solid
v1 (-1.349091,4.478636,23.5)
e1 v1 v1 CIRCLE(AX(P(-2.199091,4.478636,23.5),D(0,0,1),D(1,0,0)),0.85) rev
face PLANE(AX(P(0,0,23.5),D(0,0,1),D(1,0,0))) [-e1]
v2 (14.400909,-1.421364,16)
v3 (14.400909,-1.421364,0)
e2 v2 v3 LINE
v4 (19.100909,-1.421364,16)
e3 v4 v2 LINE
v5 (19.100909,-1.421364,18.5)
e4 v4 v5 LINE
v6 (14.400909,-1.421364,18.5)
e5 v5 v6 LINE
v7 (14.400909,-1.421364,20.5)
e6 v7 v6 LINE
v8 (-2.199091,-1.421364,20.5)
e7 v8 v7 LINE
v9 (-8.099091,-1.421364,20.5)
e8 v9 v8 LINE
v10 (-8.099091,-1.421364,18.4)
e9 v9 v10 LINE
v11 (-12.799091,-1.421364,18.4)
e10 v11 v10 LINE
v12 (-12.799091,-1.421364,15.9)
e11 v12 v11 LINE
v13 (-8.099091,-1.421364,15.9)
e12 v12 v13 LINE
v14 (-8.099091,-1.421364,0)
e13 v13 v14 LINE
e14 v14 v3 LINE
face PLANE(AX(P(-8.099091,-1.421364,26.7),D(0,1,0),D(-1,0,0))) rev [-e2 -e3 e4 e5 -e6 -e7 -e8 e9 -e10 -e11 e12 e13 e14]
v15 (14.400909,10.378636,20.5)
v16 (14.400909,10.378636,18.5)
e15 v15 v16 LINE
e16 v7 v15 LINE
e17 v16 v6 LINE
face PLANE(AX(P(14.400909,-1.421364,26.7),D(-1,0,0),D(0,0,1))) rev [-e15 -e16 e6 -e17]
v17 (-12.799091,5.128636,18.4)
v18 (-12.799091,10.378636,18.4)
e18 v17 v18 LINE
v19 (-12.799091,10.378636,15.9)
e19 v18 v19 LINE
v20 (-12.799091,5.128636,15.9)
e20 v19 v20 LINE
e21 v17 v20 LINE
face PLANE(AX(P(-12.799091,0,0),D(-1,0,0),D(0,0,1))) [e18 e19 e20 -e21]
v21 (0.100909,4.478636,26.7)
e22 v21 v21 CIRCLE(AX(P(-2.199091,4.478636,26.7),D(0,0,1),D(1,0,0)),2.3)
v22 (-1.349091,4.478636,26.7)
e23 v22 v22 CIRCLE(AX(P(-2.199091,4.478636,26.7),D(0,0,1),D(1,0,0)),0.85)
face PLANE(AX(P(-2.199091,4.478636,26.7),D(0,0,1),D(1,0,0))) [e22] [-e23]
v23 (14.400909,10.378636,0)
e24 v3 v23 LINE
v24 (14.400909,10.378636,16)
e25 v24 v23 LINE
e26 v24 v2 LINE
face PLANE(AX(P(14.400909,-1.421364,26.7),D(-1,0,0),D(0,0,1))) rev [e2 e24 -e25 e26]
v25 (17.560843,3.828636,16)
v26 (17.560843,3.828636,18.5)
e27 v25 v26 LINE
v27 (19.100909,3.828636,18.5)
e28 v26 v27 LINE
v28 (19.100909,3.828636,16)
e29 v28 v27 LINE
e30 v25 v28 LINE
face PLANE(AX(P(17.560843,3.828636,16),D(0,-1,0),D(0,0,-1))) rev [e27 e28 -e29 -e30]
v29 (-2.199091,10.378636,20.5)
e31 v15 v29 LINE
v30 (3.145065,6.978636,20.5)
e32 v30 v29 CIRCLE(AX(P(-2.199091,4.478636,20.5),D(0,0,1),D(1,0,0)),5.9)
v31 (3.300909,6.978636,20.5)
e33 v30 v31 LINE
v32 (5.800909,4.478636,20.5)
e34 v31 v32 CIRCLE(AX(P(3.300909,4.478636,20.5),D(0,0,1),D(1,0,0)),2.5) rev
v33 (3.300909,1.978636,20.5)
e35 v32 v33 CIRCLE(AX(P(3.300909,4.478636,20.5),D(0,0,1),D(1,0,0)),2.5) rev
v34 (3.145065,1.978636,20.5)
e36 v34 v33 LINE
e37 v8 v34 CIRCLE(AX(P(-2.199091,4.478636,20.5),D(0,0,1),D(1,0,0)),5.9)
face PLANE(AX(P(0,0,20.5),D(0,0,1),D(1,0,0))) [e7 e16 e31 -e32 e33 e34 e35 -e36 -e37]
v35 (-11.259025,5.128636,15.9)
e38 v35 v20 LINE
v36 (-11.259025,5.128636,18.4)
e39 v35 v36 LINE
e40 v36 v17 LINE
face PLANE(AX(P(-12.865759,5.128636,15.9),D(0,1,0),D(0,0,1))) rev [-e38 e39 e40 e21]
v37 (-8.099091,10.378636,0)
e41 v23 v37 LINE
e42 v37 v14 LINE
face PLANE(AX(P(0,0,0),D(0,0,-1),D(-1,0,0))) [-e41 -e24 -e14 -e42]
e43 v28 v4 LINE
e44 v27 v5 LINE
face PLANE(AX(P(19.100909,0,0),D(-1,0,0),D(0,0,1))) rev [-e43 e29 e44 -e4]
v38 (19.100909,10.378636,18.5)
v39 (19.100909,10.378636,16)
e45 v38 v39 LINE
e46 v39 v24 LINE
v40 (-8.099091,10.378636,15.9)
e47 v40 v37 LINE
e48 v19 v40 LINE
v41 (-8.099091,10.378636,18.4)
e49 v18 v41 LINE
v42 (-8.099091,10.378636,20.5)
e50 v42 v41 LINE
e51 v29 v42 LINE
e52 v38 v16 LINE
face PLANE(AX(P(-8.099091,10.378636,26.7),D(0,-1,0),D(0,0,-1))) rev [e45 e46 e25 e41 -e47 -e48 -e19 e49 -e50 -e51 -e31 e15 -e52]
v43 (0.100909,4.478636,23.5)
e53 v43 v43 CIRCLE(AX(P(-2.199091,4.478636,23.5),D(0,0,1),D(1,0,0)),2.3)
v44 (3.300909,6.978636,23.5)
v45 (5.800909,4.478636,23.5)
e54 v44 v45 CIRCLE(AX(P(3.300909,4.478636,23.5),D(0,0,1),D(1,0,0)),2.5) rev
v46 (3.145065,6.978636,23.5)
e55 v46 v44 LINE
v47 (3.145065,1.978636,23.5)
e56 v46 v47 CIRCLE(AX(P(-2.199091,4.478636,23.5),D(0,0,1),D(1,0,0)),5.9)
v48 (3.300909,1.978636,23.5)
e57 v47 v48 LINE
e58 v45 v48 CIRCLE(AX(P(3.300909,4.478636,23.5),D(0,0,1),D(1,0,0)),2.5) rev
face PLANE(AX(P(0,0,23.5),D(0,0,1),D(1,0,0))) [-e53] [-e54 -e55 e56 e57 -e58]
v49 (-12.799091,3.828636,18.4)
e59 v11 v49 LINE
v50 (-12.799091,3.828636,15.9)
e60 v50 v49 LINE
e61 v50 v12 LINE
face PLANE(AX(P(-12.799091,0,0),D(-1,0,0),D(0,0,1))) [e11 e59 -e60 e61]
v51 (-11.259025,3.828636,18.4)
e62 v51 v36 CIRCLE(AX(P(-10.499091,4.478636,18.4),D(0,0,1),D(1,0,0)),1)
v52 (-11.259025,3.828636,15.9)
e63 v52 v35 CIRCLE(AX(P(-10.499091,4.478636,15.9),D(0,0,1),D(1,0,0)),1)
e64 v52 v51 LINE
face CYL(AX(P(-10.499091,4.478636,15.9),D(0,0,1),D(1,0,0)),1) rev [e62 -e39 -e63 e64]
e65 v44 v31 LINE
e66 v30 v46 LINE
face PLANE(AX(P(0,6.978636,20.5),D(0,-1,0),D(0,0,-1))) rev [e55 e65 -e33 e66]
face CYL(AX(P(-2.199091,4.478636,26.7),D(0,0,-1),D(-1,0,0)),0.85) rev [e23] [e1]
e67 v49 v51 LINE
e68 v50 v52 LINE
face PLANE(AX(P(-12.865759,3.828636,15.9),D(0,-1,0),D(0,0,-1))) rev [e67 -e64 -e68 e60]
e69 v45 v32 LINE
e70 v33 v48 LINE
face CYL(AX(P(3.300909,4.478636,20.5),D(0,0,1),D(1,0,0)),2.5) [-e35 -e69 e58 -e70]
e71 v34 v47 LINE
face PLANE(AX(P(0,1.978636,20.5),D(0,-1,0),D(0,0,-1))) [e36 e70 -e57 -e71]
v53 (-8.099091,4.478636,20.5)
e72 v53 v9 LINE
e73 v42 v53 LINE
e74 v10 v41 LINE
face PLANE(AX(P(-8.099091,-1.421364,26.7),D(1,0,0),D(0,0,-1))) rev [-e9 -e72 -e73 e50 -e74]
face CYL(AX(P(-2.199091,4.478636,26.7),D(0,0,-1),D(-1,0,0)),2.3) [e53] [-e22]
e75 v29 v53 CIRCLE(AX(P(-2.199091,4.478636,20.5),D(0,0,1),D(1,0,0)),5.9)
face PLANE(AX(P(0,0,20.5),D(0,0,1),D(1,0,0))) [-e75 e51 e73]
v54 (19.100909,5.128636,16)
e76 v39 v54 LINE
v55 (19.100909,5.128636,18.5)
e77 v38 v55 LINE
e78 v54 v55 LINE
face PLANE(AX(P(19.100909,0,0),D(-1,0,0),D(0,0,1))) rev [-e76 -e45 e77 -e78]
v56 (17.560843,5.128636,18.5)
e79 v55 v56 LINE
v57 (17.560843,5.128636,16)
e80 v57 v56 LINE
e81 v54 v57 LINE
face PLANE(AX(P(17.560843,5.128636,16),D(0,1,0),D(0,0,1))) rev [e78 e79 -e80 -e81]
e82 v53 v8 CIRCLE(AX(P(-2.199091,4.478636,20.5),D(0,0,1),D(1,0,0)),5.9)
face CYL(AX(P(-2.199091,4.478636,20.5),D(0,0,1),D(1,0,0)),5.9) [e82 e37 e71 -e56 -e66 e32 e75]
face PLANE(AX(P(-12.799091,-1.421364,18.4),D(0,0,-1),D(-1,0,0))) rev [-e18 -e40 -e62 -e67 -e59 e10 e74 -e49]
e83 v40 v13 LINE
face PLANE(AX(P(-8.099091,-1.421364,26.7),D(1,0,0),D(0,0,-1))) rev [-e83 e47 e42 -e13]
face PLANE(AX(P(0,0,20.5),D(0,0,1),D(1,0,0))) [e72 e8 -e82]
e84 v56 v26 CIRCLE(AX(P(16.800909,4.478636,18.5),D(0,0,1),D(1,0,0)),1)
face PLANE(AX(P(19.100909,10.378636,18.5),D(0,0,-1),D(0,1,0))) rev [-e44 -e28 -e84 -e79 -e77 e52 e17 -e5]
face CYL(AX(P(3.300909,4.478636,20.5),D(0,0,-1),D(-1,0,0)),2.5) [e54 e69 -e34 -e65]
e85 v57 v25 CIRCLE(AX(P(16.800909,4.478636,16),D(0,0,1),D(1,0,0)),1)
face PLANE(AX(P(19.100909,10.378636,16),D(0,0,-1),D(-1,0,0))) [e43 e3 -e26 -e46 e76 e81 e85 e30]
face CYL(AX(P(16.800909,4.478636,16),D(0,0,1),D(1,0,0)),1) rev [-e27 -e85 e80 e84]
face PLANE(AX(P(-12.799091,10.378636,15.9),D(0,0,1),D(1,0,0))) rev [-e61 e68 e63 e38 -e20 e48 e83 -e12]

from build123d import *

# Parameters (mm, degrees)
SKETCH1_W           = 22.5
SKETCH1_H           = 11.8
BOSS_EXTRUDE1_DEPTH = 26.7
SKETCH2_W           = 2.5
SKETCH2_H           = 11.8
BOSS_EXTRUDE2_DEPTH = 4.7
SKETCH5_W           = 2.5
SKETCH5_H           = 11.8
BOSS_EXTRUDE3_DEPTH = 4.7
CUT_EXTRUDE1_DEPTH  = 6.2
FILLET1_R           = 2.5
FILLET2_R           = 2.5
CUT_EXTRUDE2_DEPTH  = 3.2
SKETCH7_R           = 2.3
SKETCH7_R_2         = 0.85
BOSS_EXTRUDE4_DEPTH = 3.2
CUT_EXTRUDE3_DEPTH  = 2.5
CUT_EXTRUDE4_DEPTH  = 2.5


with BuildPart() as part:
    # Sketch1 → Boss-Extrude1 (new body)
    with BuildSketch(Plane.XY):
        with Locations((3.150909091, 4.478636364)):
            Rectangle(SKETCH1_W, SKETCH1_H)
    extrude(amount=BOSS_EXTRUDE1_DEPTH)

    # Sketch2 → Boss-Extrude2 (add)
    with BuildSketch(Plane(origin=(14.400909091, 0, 0), x_dir=(0, 0, -1), z_dir=(1, 0, 0))):
        with Locations((-17.25, 4.478636364)):
            Rectangle(SKETCH2_W, SKETCH2_H)
    extrude(amount=BOSS_EXTRUDE2_DEPTH)

    # Sketch5 → Boss-Extrude3 (add)
    with BuildSketch(Plane.ZY.offset(8.099090909)):
        with Locations((17.15, 4.478636364)):
            Rectangle(SKETCH5_W, SKETCH5_H)
    extrude(amount=BOSS_EXTRUDE3_DEPTH)

    # Sketch6 → Cut-Extrude1 (cut)
    with BuildSketch(Plane.XY.offset(26.7)):
        with BuildLine():
            Line((5.800909091, 1.978636364), (3.145064777, 1.978636364))
            ThreePointArc((3.145064777, 1.978636364), (0.967926621, -0.499315019), (-2.199090896, -1.421363636))
            Line((-2.199090896, -1.421363636), (14.400909091, -1.421363636))
            Line((14.400909091, -1.421363636), (14.400909091, 10.378636364))
            Line((14.400909091, 10.378636364), (-2.199090917, 10.378636364))
            ThreePointArc((-2.199090917, 10.378636364), (0.967926612, 9.456587752), (3.145064777, 6.978636364))
            Line((3.145064777, 6.978636364), (5.800909091, 6.978636364))
            Line((5.800909091, 6.978636364), (5.800909091, 1.978636364))
        make_face()
        with BuildLine():
            Line((-8.099090909, -1.421363636), (-2.199090896, -1.421363636))
            ThreePointArc((-2.199090896, -1.421363636), (-6.371020914, 0.30670635), (-8.099090909, 4.478636364))
            Line((-8.099090909, 4.478636364), (-8.099090909, -1.421363636))
        make_face()
        with BuildLine():
            Line((-8.099090909, 10.378636364), (-8.099090909, 4.478636364))
            ThreePointArc((-8.099090909, 4.478636364), (-6.371020921, 8.65056637), (-2.199090917, 10.378636364))
            Line((-2.199090917, 10.378636364), (-8.099090909, 10.378636364))
        make_face()
    extrude(amount=-CUT_EXTRUDE1_DEPTH, mode=Mode.SUBTRACT)

    # Fillet1
    fillet1_edges = [part.edges().sort_by_distance(p)[0] for p in [
        (5.800909091, 1.978636364, 23.6),
    ]]
    fillet(fillet1_edges, radius=FILLET1_R)

    # Fillet2
    fillet2_edges = [part.edges().sort_by_distance(p)[0] for p in [
        (5.800909091, 6.978636364, 23.6),
    ]]
    fillet(fillet2_edges, radius=FILLET2_R - 0.0001)  # a hair under: the kernel refuses the full size

    # Sketch6<3> → Cut-Extrude2 (cut)
    with BuildSketch(Plane.XY.offset(26.7)):
        with BuildLine():
            Line((3.145064777, 1.978636364), (5.800909091, 1.978636364))
            Line((5.800909091, 1.978636364), (5.800909091, 6.978636364))
            Line((5.800909091, 6.978636364), (3.145064777, 6.978636364))
            ThreePointArc((3.145064777, 6.978636364), (-8.099090909, 4.478636364), (3.145064777, 1.978636364))
        make_face()
    extrude(amount=-CUT_EXTRUDE2_DEPTH, mode=Mode.SUBTRACT)

    # Sketch7 → Boss-Extrude4 (add)
    with BuildSketch(Plane.XY.offset(23.5)):
        with Locations((-2.199090909, 4.478636364)):
            Circle(SKETCH7_R)
        with Locations((-2.199090909, 4.478636364)):
            Circle(SKETCH7_R_2, mode=Mode.SUBTRACT)
    extrude(amount=BOSS_EXTRUDE4_DEPTH)

    # Sketch11 → Cut-Extrude3 (cut)
    with BuildSketch(Plane.XY.offset(18.4)):
        with BuildLine():
            Line((-12.865758951, 3.828636364), (-11.259025117, 3.828636364))
            ThreePointArc((-11.259025117, 3.828636364), (-9.499090909, 4.478636364), (-11.259025117, 5.128636364))
            Line((-11.259025117, 5.128636364), (-12.865758951, 5.128636364))
            Line((-12.865758951, 5.128636364), (-12.865758951, 3.828636364))
        make_face()
    extrude(amount=-CUT_EXTRUDE3_DEPTH, mode=Mode.SUBTRACT)

    # Sketch12 → Cut-Extrude4 (cut)
    with BuildSketch(Plane.XY.offset(18.5)):
        with BuildLine():
            Line((17.560843299, 3.828636364), (19.100909091, 3.828636364))
            Line((19.100909091, 3.828636364), (19.100909091, 5.128636364))
            Line((19.100909091, 5.128636364), (17.560843299, 5.128636364))
            ThreePointArc((17.560843299, 5.128636364), (15.800909091, 4.478636364), (17.560843299, 3.828636364))
        make_face()
    extrude(amount=-CUT_EXTRUDE4_DEPTH, mode=Mode.SUBTRACT)


solid = part.part
